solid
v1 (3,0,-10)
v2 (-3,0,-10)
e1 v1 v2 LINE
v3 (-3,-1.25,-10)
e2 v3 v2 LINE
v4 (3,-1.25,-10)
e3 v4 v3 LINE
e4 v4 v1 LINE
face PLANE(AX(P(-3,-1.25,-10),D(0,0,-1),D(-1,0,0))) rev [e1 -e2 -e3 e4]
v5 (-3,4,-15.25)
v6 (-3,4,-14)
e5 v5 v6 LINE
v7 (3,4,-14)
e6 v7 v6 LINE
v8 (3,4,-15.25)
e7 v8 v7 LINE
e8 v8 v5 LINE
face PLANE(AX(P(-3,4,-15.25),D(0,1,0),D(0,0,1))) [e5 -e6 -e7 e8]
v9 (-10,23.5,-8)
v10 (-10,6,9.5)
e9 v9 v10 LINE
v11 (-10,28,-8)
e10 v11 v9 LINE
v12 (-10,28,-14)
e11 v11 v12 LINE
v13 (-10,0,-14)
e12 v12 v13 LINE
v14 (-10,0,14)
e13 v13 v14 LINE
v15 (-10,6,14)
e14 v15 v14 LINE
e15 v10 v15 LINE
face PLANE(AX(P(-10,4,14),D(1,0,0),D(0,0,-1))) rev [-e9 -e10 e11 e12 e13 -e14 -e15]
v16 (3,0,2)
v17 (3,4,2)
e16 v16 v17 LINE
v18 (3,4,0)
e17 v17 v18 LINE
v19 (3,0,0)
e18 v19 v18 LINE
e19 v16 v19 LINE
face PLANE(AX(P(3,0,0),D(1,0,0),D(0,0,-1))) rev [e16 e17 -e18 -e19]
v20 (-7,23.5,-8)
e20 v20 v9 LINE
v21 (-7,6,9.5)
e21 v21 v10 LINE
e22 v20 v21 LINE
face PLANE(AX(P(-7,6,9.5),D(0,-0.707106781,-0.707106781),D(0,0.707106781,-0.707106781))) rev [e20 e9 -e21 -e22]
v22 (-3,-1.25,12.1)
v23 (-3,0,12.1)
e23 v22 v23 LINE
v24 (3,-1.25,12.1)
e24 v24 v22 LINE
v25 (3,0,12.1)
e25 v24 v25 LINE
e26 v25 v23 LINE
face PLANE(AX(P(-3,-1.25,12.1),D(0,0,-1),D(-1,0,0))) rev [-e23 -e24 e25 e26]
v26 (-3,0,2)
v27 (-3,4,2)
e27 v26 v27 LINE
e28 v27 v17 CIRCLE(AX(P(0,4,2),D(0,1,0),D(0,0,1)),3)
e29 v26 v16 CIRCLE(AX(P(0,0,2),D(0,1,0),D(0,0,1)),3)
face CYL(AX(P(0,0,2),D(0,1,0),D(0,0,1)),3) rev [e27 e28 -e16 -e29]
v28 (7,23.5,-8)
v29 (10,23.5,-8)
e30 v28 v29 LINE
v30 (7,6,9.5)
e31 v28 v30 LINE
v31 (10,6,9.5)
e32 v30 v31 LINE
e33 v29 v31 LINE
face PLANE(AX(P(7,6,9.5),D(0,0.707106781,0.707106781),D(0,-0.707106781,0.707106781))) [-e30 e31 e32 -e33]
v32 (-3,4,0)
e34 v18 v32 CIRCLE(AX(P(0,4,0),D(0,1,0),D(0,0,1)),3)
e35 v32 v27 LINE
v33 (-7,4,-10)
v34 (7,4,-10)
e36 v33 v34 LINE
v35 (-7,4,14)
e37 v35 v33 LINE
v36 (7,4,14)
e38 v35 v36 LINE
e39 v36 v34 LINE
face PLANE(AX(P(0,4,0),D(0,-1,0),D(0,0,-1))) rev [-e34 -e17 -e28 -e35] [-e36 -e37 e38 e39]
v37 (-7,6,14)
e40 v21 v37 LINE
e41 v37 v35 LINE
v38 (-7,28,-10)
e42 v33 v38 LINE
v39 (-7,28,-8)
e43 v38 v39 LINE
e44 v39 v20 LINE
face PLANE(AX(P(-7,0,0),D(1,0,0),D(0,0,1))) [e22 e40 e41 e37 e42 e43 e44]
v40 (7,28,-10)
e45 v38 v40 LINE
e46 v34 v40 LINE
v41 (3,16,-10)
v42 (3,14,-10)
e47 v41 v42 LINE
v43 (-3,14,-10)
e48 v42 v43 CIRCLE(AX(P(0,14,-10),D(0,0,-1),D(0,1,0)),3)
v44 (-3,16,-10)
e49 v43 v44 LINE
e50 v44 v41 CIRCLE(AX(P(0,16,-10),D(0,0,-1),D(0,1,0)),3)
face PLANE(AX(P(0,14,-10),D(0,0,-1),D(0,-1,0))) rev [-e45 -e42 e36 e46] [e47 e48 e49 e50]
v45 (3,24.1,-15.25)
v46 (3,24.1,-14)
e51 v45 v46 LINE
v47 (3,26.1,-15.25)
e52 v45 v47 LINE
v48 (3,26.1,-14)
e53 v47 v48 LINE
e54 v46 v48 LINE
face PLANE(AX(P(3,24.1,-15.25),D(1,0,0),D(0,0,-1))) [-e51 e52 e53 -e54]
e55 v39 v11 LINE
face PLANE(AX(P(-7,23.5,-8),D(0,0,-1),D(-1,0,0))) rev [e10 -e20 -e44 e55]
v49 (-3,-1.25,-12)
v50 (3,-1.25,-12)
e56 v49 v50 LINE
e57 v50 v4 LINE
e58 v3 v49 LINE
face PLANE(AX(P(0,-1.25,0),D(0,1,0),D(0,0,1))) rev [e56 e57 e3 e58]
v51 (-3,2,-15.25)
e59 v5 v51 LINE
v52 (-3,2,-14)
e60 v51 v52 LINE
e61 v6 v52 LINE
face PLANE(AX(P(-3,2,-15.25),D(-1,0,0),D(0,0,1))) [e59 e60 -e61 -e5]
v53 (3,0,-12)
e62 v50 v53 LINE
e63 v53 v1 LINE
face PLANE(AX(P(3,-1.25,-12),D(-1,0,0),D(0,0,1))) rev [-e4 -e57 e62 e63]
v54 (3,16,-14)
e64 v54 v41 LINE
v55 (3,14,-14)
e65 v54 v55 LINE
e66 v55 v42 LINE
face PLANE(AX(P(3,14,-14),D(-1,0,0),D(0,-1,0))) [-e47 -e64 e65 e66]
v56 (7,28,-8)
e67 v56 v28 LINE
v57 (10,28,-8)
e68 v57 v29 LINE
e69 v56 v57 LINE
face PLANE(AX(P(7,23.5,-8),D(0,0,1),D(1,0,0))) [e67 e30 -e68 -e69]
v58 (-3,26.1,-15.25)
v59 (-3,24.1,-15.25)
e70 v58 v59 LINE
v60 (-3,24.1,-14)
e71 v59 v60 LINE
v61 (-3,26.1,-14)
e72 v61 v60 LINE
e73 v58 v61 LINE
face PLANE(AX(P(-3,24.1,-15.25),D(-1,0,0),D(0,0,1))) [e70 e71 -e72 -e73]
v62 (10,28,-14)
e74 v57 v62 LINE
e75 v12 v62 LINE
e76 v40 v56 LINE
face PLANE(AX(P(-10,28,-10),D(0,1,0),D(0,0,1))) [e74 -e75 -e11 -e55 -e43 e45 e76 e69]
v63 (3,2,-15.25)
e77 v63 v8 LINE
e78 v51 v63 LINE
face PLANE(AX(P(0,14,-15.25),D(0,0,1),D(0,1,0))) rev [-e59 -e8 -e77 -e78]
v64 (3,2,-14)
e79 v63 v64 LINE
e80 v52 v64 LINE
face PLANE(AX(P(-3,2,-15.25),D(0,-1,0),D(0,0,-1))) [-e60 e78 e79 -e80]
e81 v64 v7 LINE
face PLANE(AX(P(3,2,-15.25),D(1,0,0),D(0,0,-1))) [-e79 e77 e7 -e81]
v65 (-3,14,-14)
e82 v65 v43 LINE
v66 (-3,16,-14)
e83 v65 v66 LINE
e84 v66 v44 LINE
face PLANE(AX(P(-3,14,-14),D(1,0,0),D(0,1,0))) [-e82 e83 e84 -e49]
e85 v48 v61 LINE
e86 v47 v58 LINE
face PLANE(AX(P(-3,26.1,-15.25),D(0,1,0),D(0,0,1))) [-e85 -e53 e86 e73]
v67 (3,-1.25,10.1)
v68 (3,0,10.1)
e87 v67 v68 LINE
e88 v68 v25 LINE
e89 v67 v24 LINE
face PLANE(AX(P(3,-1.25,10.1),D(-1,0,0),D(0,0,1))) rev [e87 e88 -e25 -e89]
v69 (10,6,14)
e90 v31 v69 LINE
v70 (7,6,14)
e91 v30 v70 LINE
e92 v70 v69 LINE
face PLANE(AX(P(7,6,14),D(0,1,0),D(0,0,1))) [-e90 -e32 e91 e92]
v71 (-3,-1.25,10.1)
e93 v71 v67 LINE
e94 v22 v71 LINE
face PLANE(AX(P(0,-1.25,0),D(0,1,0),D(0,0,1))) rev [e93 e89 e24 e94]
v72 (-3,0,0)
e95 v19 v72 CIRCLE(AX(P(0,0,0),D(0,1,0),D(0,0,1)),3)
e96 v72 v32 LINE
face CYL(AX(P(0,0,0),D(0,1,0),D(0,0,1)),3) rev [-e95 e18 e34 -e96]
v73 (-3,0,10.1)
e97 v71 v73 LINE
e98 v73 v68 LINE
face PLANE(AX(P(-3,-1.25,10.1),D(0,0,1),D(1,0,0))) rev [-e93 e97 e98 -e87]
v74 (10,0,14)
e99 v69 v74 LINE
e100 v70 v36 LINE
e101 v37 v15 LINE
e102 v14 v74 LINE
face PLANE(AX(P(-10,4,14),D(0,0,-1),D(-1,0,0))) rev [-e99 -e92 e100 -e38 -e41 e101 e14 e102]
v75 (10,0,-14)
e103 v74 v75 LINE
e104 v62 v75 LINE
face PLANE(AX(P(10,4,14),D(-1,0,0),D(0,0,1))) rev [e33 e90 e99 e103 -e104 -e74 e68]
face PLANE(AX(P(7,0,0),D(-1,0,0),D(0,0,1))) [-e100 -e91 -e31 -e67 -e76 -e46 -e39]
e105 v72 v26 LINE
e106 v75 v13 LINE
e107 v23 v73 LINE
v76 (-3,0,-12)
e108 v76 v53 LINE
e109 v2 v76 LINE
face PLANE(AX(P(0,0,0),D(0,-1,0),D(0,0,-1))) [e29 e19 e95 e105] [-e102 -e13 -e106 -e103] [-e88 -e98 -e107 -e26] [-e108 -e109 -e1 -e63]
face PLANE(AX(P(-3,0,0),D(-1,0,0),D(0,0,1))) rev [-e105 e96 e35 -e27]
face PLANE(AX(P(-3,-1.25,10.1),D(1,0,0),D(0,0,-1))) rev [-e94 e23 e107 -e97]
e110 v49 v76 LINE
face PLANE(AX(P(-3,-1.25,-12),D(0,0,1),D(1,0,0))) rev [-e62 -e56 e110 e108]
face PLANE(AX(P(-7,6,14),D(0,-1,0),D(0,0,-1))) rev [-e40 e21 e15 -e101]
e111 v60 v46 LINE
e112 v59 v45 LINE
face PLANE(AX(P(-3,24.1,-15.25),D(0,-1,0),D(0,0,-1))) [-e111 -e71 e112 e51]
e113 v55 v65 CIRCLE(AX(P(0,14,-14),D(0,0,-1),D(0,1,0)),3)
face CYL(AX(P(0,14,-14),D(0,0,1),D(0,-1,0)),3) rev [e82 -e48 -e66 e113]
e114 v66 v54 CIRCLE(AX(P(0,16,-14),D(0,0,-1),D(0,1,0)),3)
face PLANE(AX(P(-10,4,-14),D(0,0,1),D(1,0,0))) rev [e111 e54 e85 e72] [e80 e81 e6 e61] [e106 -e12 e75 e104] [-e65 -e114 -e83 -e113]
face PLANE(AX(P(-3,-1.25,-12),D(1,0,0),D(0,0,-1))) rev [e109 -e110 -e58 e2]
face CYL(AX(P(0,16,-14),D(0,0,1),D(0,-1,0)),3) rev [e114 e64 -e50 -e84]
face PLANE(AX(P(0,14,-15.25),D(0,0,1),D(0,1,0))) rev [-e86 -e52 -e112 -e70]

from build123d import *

# Parameters (mm, degrees)
SKETCH1_W           = 20
SKETCH1_H           = 28
BOSS_EXTRUDE1_DEPTH = 4
CUT_EXTRUDE1_DEPTH  = 18.663521733
SKETCH4_W           = 6
SKETCH4_H           = 2
BOSS_EXTRUDE2_DEPTH = 1.25
BOSS_EXTRUDE3_DEPTH = 3


with BuildPart() as part:
    # Sketch1 → Boss-Extrude1 (new body)
    with BuildSketch(Plane(origin=(0, 0, 0), x_dir=(1, 0, 0), z_dir=(0, 1, 0))):
        Rectangle(SKETCH1_W, SKETCH1_H)
    boss_extrude1 = extrude(amount=BOSS_EXTRUDE1_DEPTH)

    # Sketch3 → Cut-Extrude1 (cut, through all)
    with BuildSketch(Plane(origin=(0, 4, 0), x_dir=(1, 0, 0), z_dir=(0, 1, 0))):
        with BuildLine():
            Line((3, 0), (3, -2))
            ThreePointArc((3, -2), (0, -5), (-3, -2))
            Line((-3, -2), (-3, 0))
            ThreePointArc((-3, 0), (0, 3), (3, 0))
        make_face()
    cut_extrude1 = extrude(amount=-CUT_EXTRUDE1_DEPTH, mode=Mode.SUBTRACT)

    # Sketch4 → Boss-Extrude2 (add)
    with BuildSketch(Plane.XZ):
        with Locations((0, 11.1)):
            Rectangle(SKETCH4_W, SKETCH4_H)
        with Locations((0, -11)):
            Rectangle(SKETCH4_W, SKETCH4_H)
    boss_extrude2 = extrude(amount=BOSS_EXTRUDE2_DEPTH)

    # Mirror1: Boss-Extrude1, Cut-Extrude1, Boss-Extrude2 across plane
    add(boss_extrude1.mirror(Plane(origin=(0, 7, -7), x_dir=(0, 0.7071067811865478, 0.7071067811865472), z_dir=(0, -0.7071067811865475, 0.7071067811865477))))
    add(cut_extrude1.mirror(Plane(origin=(0, 7, -7), x_dir=(0, 0.7071067811865478, 0.7071067811865472), z_dir=(0, -0.7071067811865475, 0.7071067811865477))), mode=Mode.SUBTRACT)
    add(boss_extrude2.mirror(Plane(origin=(0, 7, -7), x_dir=(0, 0.7071067811865478, 0.7071067811865472), z_dir=(0, -0.7071067811865475, 0.7071067811865477))))

    # Sketch5 → Boss-Extrude3 (add)
    with BuildSketch(Plane(origin=(10, 0, 0), x_dir=(0, 0, -1), z_dir=(1, 0, 0))):
        Polygon((-14, 4), (-14, 6), (-9.5, 6), (8, 23.5), (8, 28), (10, 28), (10, 4), align=None)
    boss_extrude3 = extrude(amount=-BOSS_EXTRUDE3_DEPTH)

    # Mirror2: Boss-Extrude3 across plane
    add(boss_extrude3.mirror(Plane(origin=(0, 0, 0), x_dir=(0, 0, 1), z_dir=(1, 0, 0))))


solid = part.part
